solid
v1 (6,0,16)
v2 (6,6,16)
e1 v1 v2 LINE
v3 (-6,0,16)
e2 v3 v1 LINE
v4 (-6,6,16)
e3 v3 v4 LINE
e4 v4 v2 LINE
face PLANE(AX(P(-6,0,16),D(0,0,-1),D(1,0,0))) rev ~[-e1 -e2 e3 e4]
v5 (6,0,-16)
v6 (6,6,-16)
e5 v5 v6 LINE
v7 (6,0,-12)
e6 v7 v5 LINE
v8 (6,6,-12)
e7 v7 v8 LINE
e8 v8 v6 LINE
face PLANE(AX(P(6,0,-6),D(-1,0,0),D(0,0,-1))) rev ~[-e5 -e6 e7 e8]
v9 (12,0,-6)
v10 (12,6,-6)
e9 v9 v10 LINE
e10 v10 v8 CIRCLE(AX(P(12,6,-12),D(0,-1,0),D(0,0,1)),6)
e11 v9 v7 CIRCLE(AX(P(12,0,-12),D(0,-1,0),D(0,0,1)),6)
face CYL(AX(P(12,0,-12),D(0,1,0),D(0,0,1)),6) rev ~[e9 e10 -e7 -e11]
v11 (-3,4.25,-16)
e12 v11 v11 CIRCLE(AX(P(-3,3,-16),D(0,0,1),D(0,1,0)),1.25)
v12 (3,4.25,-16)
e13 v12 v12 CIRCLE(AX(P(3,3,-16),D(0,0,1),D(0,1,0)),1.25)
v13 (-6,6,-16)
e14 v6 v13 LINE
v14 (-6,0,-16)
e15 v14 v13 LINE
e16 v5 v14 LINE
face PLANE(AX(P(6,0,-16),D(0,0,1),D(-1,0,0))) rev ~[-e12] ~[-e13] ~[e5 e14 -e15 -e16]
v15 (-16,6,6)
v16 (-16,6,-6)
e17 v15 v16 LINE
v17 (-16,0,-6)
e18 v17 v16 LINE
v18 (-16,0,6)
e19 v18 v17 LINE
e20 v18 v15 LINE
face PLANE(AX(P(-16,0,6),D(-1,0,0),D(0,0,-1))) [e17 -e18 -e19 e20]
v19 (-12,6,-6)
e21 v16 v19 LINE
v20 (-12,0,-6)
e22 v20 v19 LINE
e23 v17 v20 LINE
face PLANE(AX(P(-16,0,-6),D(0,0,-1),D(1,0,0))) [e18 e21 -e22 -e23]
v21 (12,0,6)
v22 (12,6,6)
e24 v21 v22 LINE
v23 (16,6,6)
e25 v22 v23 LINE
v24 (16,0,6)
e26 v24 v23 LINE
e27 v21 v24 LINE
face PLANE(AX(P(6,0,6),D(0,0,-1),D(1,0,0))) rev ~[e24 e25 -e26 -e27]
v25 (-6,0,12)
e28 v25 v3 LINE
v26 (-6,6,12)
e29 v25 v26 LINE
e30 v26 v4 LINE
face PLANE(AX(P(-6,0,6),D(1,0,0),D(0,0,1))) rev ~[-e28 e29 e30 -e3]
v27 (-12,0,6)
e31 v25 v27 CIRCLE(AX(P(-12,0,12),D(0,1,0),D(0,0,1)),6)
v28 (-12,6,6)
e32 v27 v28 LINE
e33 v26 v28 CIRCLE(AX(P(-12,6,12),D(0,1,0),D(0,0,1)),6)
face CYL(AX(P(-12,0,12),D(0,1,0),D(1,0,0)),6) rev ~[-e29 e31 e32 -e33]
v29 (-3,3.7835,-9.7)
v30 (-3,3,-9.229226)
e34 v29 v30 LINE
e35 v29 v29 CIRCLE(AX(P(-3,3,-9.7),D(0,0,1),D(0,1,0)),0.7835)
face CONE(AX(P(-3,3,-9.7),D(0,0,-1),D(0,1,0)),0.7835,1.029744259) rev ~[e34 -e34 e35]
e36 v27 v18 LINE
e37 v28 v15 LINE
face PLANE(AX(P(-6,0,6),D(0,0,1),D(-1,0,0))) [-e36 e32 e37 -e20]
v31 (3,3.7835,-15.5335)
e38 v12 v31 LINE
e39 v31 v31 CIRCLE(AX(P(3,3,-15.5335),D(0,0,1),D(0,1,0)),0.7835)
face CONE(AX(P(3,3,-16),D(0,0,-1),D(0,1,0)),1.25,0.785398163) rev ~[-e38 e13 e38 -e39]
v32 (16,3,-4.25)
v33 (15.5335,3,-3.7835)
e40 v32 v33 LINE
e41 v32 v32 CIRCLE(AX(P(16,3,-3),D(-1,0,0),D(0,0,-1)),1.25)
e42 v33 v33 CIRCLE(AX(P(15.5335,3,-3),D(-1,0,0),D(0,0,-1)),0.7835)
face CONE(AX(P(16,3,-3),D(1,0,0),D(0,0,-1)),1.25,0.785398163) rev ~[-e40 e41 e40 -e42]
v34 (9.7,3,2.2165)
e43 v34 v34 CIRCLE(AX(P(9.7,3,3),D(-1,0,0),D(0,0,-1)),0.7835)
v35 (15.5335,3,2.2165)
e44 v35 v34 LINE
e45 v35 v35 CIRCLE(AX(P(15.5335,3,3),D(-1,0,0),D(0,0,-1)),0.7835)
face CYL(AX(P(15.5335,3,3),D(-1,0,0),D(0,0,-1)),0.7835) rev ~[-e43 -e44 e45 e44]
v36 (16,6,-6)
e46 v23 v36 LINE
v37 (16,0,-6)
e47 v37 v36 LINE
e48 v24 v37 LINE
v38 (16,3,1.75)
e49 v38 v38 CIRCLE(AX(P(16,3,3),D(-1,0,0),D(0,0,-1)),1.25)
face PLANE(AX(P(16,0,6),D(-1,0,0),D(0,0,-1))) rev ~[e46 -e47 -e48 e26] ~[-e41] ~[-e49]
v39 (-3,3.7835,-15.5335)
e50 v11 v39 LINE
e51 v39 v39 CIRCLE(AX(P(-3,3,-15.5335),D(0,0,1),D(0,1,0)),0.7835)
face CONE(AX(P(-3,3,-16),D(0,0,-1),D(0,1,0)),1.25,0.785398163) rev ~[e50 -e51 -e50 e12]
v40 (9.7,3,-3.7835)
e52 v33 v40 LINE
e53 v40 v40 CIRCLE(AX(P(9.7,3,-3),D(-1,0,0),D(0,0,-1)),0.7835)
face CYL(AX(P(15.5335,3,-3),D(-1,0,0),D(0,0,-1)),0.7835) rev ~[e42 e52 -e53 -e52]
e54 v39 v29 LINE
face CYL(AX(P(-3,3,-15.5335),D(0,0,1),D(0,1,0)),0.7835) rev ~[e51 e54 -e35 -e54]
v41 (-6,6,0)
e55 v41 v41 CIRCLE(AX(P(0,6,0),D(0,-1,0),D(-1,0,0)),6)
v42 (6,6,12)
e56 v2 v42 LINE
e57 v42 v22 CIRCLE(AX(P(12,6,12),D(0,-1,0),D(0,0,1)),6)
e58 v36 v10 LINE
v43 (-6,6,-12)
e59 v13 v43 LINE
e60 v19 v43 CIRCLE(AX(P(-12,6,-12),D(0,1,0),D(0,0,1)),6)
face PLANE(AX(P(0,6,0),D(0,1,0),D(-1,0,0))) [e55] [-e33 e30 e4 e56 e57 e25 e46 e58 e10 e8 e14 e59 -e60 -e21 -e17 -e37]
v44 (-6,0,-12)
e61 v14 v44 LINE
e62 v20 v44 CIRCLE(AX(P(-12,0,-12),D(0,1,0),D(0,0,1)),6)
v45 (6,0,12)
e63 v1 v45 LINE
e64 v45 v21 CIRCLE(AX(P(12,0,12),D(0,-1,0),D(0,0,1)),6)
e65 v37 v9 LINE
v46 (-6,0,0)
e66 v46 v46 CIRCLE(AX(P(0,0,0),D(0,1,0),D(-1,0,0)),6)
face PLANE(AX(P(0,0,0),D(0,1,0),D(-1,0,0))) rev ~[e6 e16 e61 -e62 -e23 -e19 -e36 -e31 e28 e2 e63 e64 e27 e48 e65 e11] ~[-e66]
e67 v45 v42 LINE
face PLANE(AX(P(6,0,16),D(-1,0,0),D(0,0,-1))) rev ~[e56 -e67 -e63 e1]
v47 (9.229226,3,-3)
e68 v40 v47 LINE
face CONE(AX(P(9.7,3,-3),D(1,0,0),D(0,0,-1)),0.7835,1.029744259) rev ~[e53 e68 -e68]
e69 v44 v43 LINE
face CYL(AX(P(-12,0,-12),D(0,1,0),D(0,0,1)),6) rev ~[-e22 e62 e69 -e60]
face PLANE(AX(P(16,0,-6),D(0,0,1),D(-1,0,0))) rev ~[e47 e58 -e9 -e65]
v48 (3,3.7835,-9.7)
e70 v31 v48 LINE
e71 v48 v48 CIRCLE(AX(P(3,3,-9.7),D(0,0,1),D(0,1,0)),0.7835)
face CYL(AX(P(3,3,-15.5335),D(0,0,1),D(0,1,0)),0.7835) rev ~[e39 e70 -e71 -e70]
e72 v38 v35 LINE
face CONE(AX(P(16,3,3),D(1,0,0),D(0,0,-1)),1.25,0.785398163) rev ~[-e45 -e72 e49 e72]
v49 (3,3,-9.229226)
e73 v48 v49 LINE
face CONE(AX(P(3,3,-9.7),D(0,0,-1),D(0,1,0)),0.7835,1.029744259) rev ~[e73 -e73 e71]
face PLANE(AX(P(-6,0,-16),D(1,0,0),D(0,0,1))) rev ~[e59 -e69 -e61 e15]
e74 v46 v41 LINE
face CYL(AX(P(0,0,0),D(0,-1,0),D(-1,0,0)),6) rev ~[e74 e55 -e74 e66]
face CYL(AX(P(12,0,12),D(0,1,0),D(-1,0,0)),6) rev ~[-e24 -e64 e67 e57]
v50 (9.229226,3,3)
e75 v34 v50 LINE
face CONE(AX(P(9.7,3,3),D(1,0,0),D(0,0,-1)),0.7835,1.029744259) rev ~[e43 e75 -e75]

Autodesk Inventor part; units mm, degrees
ref_plane "YZ Plane" through (0, 0, 0) normal (1, 0, 0) x (0, 1, 0)
ref_plane "XZ Plane" through (0, 0, 0) normal (0, 1, 0) x (-1, 0, 0)
ref_plane "XY Plane" through (0, 0, 0) normal (0, 0, 1) x (1, 0, 0)
sketch "Sketch1" plane through (0, 0, 0) normal (0, 1, 0) x (-1, 0, 0)
  line L0 (-6, 6) -> (6, 6)
  line L1 (6, 6) -> (6, -6)
  line L2 (6, -6) -> (-6, -6)
  line L3 (-6, -6) -> (-6, 6)
  line L4 (-6, 6) -> (6, -6) construction
  line L5 (6, 6) -> (-6, -6) construction
  line L6 (6, 6) -> (16, 6)
  line L7 (16, -6) -> (6, -6)
  line L8 (6, -6) -> (6, 6)
  line L9 (0, 6) -> (0, -6) construction
  line L10 (-6, 6) -> (-16, 6)
  line L11 (-16, 6) -> (-16, -6)
  line L12 (-16, -6) -> (-6, -6)
  line L13 (-6, -6) -> (-6, -16)
  line L14 (-6, -16) -> (6, -16)
  line L15 (6, -16) -> (6, -6)
  line L16 (6, 6) -> (6, 16)
  line L17 (6, 16) -> (-6, 16)
  line L18 (-6, 16) -> (-6, 6)
  line L19 (16, 6) -> (16, -6)
  line L20 (6, 6) -> (-6, -6) construction
  line L21 (-6, 6) -> (6, -6) construction
  line L22 (-6, -6) -> (6, 6) construction
  circle A0 centre (0, 0) radius 6
  dimension "d0" = 12
  dimension "d1" = 12
  dimension "d6" = 12
  dimension "d38" = 12
  dimension "d39" = 10
  dimension "d40" = 10
extrude "Extrusion9" add sketch "Sketch1" along normal blind 6 contours L18 L17 L16 L0 | L0 A0 L3 | L3 L12 L11 L10 | L0 L1 A0 | A0 L2 L3 | L6 L19 L7 L1 | L1 L2 A0 | L2 L15 L14 L13
fillet "Fillet4" radius 6 4 edges at (-6, 3, -6) (6, 3, -6) (-6, 3, 6) (6, 3, 6)
sketch "Sketch11" plane through (16, 0, 6) normal (1, 0, 0) x (0, 0, -1)
  line L0 (6, 0) -> (6, 6)
  line L1 (0, 6) -> (12, 6) projected
  circle A0 centre (9, 3) radius 1
  line L2 (12, 0) -> (12, 6) projected
  line L3 (0, 0) -> (12, 0) projected
  circle A1 centre (3, 3) radius 1
  dimension "d69" = 2
  dimension "d70" = 3
  dimension "d71" = 3
hole "Hole1" at (16, 3, 3) at (16, 3, -3) direction (-1, 0, 0) diameter 1.567 depth 6.3 tip angle 118 countersink diameter 2.5 countersink angle 90 thread size "M2x0.4" class "6H" standard "ISO Metric profile"
sketch "Sketch14" plane through (6, 0, -16) normal (0, 0, -1) x (-1, 0, 0)
  line L0 (6, 0) -> (6, 6)
  line L1 (0, 6) -> (12, 6) projected
  circle A0 centre (9, 3) radius 1
  line L2 (12, 0) -> (12, 6) projected
  line L3 (0, 0) -> (12, 0) projected
  circle A1 centre (3, 3) radius 1
  dimension "d99" = 2
  dimension "d100" = 3
  dimension "d101" = 3
hole "Hole2" at (3, 3, -16) at (-3, 3, -16) direction (0, 0, 1) diameter 1.567 depth 6.3 tip angle 118 countersink diameter 2.5 countersink angle 90 thread size "M2x0.4" class "6H" standard "ISO Metric profile"
properties part number "rapoukMiddleLeg0v3" material "EN AW-6060 T6"
